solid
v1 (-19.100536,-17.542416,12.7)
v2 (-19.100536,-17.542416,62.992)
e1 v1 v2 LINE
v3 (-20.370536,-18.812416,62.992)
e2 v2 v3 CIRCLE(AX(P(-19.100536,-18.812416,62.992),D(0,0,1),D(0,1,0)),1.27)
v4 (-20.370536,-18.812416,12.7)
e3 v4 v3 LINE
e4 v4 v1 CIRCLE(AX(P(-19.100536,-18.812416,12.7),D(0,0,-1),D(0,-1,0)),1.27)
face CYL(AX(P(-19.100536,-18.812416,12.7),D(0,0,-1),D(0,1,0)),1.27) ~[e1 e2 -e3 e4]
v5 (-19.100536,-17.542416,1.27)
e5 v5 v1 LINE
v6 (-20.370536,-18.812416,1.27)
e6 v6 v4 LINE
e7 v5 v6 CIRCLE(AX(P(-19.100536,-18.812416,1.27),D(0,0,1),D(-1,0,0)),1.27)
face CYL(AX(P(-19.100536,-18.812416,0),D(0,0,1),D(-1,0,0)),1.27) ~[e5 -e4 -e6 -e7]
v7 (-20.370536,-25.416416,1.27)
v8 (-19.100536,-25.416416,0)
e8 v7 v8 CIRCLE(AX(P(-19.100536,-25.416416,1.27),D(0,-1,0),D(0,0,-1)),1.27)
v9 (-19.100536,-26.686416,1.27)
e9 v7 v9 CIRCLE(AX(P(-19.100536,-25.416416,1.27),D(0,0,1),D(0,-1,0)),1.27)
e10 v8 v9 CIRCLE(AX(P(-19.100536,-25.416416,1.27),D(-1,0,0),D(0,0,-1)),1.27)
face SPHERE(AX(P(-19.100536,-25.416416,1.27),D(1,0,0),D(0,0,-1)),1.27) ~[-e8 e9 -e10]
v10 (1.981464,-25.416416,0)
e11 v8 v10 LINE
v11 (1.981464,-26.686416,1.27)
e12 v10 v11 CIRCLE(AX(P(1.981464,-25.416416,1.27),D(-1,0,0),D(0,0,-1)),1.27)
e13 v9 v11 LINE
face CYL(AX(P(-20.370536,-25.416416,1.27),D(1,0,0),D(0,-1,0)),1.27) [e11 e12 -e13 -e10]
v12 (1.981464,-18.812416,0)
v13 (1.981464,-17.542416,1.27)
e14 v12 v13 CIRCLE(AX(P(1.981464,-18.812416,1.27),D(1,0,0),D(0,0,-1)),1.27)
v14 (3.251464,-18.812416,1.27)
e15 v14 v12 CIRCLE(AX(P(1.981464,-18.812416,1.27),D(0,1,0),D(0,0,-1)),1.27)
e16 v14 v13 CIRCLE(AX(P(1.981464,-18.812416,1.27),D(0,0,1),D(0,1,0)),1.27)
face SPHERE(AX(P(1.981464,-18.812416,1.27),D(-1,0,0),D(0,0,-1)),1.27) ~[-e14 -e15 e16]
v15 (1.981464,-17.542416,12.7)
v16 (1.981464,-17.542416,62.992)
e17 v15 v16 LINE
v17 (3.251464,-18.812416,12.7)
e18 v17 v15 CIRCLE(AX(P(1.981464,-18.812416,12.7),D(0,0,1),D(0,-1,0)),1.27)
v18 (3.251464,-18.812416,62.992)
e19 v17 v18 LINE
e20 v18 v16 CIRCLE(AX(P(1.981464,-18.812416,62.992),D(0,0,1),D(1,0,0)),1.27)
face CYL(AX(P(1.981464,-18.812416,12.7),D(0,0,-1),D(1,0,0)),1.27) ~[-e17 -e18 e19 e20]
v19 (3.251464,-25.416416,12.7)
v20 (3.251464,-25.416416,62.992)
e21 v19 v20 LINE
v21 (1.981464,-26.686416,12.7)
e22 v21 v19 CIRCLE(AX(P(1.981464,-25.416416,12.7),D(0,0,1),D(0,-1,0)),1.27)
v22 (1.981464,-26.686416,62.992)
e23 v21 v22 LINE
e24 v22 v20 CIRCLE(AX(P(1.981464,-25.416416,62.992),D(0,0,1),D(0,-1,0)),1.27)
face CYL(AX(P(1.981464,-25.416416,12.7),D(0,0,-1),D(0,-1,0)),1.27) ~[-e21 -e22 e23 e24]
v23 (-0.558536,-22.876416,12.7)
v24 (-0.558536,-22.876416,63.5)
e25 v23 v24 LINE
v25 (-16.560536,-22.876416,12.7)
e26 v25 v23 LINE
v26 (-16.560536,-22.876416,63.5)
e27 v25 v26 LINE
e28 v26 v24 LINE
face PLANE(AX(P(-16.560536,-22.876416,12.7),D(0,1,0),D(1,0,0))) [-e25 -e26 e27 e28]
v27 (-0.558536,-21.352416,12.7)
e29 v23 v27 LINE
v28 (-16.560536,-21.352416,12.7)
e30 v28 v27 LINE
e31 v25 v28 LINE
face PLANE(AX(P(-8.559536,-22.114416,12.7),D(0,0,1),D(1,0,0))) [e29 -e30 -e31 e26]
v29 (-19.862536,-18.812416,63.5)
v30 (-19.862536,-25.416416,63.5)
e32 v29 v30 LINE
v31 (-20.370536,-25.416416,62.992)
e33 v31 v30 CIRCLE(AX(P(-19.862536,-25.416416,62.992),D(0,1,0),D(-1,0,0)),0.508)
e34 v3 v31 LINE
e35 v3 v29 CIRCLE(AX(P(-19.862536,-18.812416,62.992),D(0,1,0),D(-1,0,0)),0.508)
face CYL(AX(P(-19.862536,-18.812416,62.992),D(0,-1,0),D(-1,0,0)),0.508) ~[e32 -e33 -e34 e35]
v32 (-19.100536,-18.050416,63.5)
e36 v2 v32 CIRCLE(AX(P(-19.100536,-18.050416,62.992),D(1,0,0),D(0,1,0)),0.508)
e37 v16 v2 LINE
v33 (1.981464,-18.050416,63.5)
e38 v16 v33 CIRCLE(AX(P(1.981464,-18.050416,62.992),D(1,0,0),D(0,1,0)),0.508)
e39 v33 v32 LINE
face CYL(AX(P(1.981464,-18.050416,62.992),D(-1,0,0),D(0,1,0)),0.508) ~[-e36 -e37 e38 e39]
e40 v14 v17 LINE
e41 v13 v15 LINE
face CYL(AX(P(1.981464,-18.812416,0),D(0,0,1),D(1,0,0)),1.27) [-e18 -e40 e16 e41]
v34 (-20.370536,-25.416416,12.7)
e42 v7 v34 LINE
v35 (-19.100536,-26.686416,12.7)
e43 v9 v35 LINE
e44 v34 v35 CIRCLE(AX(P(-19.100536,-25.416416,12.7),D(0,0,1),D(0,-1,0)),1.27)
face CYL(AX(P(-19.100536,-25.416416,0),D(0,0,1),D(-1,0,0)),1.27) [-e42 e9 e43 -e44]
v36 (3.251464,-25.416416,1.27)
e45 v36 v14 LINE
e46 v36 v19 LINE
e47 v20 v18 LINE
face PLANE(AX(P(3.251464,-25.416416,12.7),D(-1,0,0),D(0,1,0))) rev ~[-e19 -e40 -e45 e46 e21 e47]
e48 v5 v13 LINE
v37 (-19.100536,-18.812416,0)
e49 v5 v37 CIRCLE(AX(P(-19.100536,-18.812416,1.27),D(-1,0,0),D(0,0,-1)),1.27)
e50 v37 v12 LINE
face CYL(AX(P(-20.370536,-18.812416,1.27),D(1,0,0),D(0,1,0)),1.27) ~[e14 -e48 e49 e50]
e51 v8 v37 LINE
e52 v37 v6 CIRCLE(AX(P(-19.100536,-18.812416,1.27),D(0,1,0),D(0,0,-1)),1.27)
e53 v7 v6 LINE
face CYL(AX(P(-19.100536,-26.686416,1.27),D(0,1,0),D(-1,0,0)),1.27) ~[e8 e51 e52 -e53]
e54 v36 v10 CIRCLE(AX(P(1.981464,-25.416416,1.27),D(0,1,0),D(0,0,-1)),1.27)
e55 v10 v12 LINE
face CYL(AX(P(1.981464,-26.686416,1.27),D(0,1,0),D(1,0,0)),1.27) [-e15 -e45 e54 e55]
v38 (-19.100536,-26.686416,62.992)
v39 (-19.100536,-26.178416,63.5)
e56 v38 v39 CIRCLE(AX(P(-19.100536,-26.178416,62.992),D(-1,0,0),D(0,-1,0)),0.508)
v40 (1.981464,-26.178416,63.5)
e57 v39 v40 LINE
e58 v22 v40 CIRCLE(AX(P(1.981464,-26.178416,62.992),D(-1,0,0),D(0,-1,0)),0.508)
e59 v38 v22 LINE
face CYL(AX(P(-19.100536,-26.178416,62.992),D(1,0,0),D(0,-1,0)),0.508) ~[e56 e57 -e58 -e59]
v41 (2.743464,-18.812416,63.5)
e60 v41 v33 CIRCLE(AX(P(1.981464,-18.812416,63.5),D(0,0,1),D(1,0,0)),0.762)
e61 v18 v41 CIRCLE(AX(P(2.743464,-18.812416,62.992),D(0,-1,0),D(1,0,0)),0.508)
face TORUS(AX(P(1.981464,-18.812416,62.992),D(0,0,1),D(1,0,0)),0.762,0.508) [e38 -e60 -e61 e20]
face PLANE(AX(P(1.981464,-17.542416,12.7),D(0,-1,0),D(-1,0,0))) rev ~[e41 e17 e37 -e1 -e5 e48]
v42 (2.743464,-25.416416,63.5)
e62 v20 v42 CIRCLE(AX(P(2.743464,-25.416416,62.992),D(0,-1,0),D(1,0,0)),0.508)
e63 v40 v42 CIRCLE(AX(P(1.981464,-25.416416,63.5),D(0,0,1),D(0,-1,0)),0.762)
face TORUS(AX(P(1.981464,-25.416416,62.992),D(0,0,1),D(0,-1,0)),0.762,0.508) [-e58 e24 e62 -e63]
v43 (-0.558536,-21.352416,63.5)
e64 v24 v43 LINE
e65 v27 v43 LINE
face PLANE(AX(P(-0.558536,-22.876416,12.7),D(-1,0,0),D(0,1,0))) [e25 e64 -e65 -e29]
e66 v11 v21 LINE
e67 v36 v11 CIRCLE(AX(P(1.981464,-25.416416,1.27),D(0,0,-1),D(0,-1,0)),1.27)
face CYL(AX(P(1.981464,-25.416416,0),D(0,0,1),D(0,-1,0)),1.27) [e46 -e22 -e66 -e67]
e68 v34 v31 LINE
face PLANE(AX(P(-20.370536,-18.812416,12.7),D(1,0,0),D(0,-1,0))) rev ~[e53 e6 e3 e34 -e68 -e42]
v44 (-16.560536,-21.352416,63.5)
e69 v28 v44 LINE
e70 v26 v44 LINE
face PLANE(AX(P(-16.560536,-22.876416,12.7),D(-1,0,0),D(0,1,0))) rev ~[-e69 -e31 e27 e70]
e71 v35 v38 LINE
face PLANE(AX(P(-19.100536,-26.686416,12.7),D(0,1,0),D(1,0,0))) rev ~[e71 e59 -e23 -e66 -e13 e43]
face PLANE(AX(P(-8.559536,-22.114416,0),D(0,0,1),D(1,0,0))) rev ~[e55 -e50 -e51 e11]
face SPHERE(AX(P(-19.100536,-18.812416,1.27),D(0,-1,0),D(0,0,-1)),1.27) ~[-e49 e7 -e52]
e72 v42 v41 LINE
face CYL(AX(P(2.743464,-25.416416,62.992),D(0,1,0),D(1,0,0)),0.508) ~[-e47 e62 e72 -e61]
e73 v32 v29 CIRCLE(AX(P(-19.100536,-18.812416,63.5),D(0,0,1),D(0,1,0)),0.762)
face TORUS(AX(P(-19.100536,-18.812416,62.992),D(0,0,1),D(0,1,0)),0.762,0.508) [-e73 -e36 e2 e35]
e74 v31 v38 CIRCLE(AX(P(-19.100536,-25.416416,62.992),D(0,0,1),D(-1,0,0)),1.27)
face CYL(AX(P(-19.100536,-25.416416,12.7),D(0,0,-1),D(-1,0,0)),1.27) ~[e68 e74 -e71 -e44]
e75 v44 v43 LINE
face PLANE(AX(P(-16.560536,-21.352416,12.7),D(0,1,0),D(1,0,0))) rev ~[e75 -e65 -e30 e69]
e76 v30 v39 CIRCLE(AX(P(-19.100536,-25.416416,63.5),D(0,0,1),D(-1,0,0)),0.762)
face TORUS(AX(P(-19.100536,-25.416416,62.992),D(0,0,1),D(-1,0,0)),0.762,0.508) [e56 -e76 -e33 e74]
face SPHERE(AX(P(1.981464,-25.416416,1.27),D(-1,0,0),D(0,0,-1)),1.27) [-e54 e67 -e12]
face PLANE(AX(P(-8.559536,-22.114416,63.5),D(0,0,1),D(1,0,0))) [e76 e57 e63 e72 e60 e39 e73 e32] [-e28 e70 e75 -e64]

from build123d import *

# Parameters (mm, degrees)
F0_W     = 23.622
F0_H     = 9.144
F1_DEPTH = 12.7
F2_R     = 1.27
F3_W     = 16.002
F3_H     = 1.524
F4_DEPTH = 50.8
F5_R     = 0.508


with BuildPart() as f1:
    # F0 (on Top) → F1 (new body)
    with BuildSketch(Plane.XY):
        with Locations((-8.5595357362, -22.114415653)):
            Rectangle(F0_W, F0_H)
    extrude(amount=F1_DEPTH)

    # F2
    f2_edges = [f1.edges().sort_by_distance(p)[0] for p in [
        (-8.559536, -26.686416, 0),
        (-20.370536, -22.114416, 0),
        (-8.559536, -17.542416, 0),
        (3.251464, -22.114416, 0),
        (3.251464, -17.542416, 6.35),
        (-20.370536, -17.542416, 6.35),
        (-20.370536, -26.686416, 6.35),
        (3.251464, -26.686416, 6.35),
    ]]
    fillet(f2_edges, radius=F2_R)

    # F3 (on face) → F4 (join)
    with BuildSketch(Plane.XY.offset(12.7)):
        with BuildLine():
            ThreePointArc((3.2514642638, -18.812415653), (2.8794898759, -17.9143900409), (1.9814642638, -17.542415653))
            Line((1.9814642638, -17.542415653), (-19.1005357362, -17.542415653))
            ThreePointArc((-19.1005357362, -17.542415653), (-19.9985613483, -17.9143900409), (-20.3705357362, -18.812415653))
            Line((-20.3705357362, -18.812415653), (-20.3705357362, -25.416415653))
            ThreePointArc((-20.3705357362, -25.416415653), (-19.9985613483, -26.3144412652), (-19.1005357362, -26.686415653))
            Line((-19.1005357362, -26.686415653), (1.9814642638, -26.686415653))
            ThreePointArc((1.9814642638, -26.686415653), (2.8794898759, -26.3144412652), (3.2514642638, -25.416415653))
            Line((3.2514642638, -25.416415653), (3.2514642638, -18.812415653))
        make_face()
        with Locations((-8.5595357362, -22.114415653)):
            Rectangle(F3_W, F3_H, mode=Mode.SUBTRACT)
    extrude(amount=F4_DEPTH)

    # F5
    f5_edges = [f1.edges().sort_by_distance(p)[0] for p in [
        (-8.559536, -17.542416, 63.5),
        (3.251464, -22.114416, 63.5),
        (-8.559536, -26.686416, 63.5),
        (-20.370536, -22.114416, 63.5),
        (2.87949, -26.314441, 63.5),
        (-19.998561, -26.314441, 63.5),
        (-19.998561, -17.91439, 63.5),
        (2.87949, -17.91439, 63.5),
    ]]
    fillet(f5_edges, radius=F5_R)


solid = f1.part
